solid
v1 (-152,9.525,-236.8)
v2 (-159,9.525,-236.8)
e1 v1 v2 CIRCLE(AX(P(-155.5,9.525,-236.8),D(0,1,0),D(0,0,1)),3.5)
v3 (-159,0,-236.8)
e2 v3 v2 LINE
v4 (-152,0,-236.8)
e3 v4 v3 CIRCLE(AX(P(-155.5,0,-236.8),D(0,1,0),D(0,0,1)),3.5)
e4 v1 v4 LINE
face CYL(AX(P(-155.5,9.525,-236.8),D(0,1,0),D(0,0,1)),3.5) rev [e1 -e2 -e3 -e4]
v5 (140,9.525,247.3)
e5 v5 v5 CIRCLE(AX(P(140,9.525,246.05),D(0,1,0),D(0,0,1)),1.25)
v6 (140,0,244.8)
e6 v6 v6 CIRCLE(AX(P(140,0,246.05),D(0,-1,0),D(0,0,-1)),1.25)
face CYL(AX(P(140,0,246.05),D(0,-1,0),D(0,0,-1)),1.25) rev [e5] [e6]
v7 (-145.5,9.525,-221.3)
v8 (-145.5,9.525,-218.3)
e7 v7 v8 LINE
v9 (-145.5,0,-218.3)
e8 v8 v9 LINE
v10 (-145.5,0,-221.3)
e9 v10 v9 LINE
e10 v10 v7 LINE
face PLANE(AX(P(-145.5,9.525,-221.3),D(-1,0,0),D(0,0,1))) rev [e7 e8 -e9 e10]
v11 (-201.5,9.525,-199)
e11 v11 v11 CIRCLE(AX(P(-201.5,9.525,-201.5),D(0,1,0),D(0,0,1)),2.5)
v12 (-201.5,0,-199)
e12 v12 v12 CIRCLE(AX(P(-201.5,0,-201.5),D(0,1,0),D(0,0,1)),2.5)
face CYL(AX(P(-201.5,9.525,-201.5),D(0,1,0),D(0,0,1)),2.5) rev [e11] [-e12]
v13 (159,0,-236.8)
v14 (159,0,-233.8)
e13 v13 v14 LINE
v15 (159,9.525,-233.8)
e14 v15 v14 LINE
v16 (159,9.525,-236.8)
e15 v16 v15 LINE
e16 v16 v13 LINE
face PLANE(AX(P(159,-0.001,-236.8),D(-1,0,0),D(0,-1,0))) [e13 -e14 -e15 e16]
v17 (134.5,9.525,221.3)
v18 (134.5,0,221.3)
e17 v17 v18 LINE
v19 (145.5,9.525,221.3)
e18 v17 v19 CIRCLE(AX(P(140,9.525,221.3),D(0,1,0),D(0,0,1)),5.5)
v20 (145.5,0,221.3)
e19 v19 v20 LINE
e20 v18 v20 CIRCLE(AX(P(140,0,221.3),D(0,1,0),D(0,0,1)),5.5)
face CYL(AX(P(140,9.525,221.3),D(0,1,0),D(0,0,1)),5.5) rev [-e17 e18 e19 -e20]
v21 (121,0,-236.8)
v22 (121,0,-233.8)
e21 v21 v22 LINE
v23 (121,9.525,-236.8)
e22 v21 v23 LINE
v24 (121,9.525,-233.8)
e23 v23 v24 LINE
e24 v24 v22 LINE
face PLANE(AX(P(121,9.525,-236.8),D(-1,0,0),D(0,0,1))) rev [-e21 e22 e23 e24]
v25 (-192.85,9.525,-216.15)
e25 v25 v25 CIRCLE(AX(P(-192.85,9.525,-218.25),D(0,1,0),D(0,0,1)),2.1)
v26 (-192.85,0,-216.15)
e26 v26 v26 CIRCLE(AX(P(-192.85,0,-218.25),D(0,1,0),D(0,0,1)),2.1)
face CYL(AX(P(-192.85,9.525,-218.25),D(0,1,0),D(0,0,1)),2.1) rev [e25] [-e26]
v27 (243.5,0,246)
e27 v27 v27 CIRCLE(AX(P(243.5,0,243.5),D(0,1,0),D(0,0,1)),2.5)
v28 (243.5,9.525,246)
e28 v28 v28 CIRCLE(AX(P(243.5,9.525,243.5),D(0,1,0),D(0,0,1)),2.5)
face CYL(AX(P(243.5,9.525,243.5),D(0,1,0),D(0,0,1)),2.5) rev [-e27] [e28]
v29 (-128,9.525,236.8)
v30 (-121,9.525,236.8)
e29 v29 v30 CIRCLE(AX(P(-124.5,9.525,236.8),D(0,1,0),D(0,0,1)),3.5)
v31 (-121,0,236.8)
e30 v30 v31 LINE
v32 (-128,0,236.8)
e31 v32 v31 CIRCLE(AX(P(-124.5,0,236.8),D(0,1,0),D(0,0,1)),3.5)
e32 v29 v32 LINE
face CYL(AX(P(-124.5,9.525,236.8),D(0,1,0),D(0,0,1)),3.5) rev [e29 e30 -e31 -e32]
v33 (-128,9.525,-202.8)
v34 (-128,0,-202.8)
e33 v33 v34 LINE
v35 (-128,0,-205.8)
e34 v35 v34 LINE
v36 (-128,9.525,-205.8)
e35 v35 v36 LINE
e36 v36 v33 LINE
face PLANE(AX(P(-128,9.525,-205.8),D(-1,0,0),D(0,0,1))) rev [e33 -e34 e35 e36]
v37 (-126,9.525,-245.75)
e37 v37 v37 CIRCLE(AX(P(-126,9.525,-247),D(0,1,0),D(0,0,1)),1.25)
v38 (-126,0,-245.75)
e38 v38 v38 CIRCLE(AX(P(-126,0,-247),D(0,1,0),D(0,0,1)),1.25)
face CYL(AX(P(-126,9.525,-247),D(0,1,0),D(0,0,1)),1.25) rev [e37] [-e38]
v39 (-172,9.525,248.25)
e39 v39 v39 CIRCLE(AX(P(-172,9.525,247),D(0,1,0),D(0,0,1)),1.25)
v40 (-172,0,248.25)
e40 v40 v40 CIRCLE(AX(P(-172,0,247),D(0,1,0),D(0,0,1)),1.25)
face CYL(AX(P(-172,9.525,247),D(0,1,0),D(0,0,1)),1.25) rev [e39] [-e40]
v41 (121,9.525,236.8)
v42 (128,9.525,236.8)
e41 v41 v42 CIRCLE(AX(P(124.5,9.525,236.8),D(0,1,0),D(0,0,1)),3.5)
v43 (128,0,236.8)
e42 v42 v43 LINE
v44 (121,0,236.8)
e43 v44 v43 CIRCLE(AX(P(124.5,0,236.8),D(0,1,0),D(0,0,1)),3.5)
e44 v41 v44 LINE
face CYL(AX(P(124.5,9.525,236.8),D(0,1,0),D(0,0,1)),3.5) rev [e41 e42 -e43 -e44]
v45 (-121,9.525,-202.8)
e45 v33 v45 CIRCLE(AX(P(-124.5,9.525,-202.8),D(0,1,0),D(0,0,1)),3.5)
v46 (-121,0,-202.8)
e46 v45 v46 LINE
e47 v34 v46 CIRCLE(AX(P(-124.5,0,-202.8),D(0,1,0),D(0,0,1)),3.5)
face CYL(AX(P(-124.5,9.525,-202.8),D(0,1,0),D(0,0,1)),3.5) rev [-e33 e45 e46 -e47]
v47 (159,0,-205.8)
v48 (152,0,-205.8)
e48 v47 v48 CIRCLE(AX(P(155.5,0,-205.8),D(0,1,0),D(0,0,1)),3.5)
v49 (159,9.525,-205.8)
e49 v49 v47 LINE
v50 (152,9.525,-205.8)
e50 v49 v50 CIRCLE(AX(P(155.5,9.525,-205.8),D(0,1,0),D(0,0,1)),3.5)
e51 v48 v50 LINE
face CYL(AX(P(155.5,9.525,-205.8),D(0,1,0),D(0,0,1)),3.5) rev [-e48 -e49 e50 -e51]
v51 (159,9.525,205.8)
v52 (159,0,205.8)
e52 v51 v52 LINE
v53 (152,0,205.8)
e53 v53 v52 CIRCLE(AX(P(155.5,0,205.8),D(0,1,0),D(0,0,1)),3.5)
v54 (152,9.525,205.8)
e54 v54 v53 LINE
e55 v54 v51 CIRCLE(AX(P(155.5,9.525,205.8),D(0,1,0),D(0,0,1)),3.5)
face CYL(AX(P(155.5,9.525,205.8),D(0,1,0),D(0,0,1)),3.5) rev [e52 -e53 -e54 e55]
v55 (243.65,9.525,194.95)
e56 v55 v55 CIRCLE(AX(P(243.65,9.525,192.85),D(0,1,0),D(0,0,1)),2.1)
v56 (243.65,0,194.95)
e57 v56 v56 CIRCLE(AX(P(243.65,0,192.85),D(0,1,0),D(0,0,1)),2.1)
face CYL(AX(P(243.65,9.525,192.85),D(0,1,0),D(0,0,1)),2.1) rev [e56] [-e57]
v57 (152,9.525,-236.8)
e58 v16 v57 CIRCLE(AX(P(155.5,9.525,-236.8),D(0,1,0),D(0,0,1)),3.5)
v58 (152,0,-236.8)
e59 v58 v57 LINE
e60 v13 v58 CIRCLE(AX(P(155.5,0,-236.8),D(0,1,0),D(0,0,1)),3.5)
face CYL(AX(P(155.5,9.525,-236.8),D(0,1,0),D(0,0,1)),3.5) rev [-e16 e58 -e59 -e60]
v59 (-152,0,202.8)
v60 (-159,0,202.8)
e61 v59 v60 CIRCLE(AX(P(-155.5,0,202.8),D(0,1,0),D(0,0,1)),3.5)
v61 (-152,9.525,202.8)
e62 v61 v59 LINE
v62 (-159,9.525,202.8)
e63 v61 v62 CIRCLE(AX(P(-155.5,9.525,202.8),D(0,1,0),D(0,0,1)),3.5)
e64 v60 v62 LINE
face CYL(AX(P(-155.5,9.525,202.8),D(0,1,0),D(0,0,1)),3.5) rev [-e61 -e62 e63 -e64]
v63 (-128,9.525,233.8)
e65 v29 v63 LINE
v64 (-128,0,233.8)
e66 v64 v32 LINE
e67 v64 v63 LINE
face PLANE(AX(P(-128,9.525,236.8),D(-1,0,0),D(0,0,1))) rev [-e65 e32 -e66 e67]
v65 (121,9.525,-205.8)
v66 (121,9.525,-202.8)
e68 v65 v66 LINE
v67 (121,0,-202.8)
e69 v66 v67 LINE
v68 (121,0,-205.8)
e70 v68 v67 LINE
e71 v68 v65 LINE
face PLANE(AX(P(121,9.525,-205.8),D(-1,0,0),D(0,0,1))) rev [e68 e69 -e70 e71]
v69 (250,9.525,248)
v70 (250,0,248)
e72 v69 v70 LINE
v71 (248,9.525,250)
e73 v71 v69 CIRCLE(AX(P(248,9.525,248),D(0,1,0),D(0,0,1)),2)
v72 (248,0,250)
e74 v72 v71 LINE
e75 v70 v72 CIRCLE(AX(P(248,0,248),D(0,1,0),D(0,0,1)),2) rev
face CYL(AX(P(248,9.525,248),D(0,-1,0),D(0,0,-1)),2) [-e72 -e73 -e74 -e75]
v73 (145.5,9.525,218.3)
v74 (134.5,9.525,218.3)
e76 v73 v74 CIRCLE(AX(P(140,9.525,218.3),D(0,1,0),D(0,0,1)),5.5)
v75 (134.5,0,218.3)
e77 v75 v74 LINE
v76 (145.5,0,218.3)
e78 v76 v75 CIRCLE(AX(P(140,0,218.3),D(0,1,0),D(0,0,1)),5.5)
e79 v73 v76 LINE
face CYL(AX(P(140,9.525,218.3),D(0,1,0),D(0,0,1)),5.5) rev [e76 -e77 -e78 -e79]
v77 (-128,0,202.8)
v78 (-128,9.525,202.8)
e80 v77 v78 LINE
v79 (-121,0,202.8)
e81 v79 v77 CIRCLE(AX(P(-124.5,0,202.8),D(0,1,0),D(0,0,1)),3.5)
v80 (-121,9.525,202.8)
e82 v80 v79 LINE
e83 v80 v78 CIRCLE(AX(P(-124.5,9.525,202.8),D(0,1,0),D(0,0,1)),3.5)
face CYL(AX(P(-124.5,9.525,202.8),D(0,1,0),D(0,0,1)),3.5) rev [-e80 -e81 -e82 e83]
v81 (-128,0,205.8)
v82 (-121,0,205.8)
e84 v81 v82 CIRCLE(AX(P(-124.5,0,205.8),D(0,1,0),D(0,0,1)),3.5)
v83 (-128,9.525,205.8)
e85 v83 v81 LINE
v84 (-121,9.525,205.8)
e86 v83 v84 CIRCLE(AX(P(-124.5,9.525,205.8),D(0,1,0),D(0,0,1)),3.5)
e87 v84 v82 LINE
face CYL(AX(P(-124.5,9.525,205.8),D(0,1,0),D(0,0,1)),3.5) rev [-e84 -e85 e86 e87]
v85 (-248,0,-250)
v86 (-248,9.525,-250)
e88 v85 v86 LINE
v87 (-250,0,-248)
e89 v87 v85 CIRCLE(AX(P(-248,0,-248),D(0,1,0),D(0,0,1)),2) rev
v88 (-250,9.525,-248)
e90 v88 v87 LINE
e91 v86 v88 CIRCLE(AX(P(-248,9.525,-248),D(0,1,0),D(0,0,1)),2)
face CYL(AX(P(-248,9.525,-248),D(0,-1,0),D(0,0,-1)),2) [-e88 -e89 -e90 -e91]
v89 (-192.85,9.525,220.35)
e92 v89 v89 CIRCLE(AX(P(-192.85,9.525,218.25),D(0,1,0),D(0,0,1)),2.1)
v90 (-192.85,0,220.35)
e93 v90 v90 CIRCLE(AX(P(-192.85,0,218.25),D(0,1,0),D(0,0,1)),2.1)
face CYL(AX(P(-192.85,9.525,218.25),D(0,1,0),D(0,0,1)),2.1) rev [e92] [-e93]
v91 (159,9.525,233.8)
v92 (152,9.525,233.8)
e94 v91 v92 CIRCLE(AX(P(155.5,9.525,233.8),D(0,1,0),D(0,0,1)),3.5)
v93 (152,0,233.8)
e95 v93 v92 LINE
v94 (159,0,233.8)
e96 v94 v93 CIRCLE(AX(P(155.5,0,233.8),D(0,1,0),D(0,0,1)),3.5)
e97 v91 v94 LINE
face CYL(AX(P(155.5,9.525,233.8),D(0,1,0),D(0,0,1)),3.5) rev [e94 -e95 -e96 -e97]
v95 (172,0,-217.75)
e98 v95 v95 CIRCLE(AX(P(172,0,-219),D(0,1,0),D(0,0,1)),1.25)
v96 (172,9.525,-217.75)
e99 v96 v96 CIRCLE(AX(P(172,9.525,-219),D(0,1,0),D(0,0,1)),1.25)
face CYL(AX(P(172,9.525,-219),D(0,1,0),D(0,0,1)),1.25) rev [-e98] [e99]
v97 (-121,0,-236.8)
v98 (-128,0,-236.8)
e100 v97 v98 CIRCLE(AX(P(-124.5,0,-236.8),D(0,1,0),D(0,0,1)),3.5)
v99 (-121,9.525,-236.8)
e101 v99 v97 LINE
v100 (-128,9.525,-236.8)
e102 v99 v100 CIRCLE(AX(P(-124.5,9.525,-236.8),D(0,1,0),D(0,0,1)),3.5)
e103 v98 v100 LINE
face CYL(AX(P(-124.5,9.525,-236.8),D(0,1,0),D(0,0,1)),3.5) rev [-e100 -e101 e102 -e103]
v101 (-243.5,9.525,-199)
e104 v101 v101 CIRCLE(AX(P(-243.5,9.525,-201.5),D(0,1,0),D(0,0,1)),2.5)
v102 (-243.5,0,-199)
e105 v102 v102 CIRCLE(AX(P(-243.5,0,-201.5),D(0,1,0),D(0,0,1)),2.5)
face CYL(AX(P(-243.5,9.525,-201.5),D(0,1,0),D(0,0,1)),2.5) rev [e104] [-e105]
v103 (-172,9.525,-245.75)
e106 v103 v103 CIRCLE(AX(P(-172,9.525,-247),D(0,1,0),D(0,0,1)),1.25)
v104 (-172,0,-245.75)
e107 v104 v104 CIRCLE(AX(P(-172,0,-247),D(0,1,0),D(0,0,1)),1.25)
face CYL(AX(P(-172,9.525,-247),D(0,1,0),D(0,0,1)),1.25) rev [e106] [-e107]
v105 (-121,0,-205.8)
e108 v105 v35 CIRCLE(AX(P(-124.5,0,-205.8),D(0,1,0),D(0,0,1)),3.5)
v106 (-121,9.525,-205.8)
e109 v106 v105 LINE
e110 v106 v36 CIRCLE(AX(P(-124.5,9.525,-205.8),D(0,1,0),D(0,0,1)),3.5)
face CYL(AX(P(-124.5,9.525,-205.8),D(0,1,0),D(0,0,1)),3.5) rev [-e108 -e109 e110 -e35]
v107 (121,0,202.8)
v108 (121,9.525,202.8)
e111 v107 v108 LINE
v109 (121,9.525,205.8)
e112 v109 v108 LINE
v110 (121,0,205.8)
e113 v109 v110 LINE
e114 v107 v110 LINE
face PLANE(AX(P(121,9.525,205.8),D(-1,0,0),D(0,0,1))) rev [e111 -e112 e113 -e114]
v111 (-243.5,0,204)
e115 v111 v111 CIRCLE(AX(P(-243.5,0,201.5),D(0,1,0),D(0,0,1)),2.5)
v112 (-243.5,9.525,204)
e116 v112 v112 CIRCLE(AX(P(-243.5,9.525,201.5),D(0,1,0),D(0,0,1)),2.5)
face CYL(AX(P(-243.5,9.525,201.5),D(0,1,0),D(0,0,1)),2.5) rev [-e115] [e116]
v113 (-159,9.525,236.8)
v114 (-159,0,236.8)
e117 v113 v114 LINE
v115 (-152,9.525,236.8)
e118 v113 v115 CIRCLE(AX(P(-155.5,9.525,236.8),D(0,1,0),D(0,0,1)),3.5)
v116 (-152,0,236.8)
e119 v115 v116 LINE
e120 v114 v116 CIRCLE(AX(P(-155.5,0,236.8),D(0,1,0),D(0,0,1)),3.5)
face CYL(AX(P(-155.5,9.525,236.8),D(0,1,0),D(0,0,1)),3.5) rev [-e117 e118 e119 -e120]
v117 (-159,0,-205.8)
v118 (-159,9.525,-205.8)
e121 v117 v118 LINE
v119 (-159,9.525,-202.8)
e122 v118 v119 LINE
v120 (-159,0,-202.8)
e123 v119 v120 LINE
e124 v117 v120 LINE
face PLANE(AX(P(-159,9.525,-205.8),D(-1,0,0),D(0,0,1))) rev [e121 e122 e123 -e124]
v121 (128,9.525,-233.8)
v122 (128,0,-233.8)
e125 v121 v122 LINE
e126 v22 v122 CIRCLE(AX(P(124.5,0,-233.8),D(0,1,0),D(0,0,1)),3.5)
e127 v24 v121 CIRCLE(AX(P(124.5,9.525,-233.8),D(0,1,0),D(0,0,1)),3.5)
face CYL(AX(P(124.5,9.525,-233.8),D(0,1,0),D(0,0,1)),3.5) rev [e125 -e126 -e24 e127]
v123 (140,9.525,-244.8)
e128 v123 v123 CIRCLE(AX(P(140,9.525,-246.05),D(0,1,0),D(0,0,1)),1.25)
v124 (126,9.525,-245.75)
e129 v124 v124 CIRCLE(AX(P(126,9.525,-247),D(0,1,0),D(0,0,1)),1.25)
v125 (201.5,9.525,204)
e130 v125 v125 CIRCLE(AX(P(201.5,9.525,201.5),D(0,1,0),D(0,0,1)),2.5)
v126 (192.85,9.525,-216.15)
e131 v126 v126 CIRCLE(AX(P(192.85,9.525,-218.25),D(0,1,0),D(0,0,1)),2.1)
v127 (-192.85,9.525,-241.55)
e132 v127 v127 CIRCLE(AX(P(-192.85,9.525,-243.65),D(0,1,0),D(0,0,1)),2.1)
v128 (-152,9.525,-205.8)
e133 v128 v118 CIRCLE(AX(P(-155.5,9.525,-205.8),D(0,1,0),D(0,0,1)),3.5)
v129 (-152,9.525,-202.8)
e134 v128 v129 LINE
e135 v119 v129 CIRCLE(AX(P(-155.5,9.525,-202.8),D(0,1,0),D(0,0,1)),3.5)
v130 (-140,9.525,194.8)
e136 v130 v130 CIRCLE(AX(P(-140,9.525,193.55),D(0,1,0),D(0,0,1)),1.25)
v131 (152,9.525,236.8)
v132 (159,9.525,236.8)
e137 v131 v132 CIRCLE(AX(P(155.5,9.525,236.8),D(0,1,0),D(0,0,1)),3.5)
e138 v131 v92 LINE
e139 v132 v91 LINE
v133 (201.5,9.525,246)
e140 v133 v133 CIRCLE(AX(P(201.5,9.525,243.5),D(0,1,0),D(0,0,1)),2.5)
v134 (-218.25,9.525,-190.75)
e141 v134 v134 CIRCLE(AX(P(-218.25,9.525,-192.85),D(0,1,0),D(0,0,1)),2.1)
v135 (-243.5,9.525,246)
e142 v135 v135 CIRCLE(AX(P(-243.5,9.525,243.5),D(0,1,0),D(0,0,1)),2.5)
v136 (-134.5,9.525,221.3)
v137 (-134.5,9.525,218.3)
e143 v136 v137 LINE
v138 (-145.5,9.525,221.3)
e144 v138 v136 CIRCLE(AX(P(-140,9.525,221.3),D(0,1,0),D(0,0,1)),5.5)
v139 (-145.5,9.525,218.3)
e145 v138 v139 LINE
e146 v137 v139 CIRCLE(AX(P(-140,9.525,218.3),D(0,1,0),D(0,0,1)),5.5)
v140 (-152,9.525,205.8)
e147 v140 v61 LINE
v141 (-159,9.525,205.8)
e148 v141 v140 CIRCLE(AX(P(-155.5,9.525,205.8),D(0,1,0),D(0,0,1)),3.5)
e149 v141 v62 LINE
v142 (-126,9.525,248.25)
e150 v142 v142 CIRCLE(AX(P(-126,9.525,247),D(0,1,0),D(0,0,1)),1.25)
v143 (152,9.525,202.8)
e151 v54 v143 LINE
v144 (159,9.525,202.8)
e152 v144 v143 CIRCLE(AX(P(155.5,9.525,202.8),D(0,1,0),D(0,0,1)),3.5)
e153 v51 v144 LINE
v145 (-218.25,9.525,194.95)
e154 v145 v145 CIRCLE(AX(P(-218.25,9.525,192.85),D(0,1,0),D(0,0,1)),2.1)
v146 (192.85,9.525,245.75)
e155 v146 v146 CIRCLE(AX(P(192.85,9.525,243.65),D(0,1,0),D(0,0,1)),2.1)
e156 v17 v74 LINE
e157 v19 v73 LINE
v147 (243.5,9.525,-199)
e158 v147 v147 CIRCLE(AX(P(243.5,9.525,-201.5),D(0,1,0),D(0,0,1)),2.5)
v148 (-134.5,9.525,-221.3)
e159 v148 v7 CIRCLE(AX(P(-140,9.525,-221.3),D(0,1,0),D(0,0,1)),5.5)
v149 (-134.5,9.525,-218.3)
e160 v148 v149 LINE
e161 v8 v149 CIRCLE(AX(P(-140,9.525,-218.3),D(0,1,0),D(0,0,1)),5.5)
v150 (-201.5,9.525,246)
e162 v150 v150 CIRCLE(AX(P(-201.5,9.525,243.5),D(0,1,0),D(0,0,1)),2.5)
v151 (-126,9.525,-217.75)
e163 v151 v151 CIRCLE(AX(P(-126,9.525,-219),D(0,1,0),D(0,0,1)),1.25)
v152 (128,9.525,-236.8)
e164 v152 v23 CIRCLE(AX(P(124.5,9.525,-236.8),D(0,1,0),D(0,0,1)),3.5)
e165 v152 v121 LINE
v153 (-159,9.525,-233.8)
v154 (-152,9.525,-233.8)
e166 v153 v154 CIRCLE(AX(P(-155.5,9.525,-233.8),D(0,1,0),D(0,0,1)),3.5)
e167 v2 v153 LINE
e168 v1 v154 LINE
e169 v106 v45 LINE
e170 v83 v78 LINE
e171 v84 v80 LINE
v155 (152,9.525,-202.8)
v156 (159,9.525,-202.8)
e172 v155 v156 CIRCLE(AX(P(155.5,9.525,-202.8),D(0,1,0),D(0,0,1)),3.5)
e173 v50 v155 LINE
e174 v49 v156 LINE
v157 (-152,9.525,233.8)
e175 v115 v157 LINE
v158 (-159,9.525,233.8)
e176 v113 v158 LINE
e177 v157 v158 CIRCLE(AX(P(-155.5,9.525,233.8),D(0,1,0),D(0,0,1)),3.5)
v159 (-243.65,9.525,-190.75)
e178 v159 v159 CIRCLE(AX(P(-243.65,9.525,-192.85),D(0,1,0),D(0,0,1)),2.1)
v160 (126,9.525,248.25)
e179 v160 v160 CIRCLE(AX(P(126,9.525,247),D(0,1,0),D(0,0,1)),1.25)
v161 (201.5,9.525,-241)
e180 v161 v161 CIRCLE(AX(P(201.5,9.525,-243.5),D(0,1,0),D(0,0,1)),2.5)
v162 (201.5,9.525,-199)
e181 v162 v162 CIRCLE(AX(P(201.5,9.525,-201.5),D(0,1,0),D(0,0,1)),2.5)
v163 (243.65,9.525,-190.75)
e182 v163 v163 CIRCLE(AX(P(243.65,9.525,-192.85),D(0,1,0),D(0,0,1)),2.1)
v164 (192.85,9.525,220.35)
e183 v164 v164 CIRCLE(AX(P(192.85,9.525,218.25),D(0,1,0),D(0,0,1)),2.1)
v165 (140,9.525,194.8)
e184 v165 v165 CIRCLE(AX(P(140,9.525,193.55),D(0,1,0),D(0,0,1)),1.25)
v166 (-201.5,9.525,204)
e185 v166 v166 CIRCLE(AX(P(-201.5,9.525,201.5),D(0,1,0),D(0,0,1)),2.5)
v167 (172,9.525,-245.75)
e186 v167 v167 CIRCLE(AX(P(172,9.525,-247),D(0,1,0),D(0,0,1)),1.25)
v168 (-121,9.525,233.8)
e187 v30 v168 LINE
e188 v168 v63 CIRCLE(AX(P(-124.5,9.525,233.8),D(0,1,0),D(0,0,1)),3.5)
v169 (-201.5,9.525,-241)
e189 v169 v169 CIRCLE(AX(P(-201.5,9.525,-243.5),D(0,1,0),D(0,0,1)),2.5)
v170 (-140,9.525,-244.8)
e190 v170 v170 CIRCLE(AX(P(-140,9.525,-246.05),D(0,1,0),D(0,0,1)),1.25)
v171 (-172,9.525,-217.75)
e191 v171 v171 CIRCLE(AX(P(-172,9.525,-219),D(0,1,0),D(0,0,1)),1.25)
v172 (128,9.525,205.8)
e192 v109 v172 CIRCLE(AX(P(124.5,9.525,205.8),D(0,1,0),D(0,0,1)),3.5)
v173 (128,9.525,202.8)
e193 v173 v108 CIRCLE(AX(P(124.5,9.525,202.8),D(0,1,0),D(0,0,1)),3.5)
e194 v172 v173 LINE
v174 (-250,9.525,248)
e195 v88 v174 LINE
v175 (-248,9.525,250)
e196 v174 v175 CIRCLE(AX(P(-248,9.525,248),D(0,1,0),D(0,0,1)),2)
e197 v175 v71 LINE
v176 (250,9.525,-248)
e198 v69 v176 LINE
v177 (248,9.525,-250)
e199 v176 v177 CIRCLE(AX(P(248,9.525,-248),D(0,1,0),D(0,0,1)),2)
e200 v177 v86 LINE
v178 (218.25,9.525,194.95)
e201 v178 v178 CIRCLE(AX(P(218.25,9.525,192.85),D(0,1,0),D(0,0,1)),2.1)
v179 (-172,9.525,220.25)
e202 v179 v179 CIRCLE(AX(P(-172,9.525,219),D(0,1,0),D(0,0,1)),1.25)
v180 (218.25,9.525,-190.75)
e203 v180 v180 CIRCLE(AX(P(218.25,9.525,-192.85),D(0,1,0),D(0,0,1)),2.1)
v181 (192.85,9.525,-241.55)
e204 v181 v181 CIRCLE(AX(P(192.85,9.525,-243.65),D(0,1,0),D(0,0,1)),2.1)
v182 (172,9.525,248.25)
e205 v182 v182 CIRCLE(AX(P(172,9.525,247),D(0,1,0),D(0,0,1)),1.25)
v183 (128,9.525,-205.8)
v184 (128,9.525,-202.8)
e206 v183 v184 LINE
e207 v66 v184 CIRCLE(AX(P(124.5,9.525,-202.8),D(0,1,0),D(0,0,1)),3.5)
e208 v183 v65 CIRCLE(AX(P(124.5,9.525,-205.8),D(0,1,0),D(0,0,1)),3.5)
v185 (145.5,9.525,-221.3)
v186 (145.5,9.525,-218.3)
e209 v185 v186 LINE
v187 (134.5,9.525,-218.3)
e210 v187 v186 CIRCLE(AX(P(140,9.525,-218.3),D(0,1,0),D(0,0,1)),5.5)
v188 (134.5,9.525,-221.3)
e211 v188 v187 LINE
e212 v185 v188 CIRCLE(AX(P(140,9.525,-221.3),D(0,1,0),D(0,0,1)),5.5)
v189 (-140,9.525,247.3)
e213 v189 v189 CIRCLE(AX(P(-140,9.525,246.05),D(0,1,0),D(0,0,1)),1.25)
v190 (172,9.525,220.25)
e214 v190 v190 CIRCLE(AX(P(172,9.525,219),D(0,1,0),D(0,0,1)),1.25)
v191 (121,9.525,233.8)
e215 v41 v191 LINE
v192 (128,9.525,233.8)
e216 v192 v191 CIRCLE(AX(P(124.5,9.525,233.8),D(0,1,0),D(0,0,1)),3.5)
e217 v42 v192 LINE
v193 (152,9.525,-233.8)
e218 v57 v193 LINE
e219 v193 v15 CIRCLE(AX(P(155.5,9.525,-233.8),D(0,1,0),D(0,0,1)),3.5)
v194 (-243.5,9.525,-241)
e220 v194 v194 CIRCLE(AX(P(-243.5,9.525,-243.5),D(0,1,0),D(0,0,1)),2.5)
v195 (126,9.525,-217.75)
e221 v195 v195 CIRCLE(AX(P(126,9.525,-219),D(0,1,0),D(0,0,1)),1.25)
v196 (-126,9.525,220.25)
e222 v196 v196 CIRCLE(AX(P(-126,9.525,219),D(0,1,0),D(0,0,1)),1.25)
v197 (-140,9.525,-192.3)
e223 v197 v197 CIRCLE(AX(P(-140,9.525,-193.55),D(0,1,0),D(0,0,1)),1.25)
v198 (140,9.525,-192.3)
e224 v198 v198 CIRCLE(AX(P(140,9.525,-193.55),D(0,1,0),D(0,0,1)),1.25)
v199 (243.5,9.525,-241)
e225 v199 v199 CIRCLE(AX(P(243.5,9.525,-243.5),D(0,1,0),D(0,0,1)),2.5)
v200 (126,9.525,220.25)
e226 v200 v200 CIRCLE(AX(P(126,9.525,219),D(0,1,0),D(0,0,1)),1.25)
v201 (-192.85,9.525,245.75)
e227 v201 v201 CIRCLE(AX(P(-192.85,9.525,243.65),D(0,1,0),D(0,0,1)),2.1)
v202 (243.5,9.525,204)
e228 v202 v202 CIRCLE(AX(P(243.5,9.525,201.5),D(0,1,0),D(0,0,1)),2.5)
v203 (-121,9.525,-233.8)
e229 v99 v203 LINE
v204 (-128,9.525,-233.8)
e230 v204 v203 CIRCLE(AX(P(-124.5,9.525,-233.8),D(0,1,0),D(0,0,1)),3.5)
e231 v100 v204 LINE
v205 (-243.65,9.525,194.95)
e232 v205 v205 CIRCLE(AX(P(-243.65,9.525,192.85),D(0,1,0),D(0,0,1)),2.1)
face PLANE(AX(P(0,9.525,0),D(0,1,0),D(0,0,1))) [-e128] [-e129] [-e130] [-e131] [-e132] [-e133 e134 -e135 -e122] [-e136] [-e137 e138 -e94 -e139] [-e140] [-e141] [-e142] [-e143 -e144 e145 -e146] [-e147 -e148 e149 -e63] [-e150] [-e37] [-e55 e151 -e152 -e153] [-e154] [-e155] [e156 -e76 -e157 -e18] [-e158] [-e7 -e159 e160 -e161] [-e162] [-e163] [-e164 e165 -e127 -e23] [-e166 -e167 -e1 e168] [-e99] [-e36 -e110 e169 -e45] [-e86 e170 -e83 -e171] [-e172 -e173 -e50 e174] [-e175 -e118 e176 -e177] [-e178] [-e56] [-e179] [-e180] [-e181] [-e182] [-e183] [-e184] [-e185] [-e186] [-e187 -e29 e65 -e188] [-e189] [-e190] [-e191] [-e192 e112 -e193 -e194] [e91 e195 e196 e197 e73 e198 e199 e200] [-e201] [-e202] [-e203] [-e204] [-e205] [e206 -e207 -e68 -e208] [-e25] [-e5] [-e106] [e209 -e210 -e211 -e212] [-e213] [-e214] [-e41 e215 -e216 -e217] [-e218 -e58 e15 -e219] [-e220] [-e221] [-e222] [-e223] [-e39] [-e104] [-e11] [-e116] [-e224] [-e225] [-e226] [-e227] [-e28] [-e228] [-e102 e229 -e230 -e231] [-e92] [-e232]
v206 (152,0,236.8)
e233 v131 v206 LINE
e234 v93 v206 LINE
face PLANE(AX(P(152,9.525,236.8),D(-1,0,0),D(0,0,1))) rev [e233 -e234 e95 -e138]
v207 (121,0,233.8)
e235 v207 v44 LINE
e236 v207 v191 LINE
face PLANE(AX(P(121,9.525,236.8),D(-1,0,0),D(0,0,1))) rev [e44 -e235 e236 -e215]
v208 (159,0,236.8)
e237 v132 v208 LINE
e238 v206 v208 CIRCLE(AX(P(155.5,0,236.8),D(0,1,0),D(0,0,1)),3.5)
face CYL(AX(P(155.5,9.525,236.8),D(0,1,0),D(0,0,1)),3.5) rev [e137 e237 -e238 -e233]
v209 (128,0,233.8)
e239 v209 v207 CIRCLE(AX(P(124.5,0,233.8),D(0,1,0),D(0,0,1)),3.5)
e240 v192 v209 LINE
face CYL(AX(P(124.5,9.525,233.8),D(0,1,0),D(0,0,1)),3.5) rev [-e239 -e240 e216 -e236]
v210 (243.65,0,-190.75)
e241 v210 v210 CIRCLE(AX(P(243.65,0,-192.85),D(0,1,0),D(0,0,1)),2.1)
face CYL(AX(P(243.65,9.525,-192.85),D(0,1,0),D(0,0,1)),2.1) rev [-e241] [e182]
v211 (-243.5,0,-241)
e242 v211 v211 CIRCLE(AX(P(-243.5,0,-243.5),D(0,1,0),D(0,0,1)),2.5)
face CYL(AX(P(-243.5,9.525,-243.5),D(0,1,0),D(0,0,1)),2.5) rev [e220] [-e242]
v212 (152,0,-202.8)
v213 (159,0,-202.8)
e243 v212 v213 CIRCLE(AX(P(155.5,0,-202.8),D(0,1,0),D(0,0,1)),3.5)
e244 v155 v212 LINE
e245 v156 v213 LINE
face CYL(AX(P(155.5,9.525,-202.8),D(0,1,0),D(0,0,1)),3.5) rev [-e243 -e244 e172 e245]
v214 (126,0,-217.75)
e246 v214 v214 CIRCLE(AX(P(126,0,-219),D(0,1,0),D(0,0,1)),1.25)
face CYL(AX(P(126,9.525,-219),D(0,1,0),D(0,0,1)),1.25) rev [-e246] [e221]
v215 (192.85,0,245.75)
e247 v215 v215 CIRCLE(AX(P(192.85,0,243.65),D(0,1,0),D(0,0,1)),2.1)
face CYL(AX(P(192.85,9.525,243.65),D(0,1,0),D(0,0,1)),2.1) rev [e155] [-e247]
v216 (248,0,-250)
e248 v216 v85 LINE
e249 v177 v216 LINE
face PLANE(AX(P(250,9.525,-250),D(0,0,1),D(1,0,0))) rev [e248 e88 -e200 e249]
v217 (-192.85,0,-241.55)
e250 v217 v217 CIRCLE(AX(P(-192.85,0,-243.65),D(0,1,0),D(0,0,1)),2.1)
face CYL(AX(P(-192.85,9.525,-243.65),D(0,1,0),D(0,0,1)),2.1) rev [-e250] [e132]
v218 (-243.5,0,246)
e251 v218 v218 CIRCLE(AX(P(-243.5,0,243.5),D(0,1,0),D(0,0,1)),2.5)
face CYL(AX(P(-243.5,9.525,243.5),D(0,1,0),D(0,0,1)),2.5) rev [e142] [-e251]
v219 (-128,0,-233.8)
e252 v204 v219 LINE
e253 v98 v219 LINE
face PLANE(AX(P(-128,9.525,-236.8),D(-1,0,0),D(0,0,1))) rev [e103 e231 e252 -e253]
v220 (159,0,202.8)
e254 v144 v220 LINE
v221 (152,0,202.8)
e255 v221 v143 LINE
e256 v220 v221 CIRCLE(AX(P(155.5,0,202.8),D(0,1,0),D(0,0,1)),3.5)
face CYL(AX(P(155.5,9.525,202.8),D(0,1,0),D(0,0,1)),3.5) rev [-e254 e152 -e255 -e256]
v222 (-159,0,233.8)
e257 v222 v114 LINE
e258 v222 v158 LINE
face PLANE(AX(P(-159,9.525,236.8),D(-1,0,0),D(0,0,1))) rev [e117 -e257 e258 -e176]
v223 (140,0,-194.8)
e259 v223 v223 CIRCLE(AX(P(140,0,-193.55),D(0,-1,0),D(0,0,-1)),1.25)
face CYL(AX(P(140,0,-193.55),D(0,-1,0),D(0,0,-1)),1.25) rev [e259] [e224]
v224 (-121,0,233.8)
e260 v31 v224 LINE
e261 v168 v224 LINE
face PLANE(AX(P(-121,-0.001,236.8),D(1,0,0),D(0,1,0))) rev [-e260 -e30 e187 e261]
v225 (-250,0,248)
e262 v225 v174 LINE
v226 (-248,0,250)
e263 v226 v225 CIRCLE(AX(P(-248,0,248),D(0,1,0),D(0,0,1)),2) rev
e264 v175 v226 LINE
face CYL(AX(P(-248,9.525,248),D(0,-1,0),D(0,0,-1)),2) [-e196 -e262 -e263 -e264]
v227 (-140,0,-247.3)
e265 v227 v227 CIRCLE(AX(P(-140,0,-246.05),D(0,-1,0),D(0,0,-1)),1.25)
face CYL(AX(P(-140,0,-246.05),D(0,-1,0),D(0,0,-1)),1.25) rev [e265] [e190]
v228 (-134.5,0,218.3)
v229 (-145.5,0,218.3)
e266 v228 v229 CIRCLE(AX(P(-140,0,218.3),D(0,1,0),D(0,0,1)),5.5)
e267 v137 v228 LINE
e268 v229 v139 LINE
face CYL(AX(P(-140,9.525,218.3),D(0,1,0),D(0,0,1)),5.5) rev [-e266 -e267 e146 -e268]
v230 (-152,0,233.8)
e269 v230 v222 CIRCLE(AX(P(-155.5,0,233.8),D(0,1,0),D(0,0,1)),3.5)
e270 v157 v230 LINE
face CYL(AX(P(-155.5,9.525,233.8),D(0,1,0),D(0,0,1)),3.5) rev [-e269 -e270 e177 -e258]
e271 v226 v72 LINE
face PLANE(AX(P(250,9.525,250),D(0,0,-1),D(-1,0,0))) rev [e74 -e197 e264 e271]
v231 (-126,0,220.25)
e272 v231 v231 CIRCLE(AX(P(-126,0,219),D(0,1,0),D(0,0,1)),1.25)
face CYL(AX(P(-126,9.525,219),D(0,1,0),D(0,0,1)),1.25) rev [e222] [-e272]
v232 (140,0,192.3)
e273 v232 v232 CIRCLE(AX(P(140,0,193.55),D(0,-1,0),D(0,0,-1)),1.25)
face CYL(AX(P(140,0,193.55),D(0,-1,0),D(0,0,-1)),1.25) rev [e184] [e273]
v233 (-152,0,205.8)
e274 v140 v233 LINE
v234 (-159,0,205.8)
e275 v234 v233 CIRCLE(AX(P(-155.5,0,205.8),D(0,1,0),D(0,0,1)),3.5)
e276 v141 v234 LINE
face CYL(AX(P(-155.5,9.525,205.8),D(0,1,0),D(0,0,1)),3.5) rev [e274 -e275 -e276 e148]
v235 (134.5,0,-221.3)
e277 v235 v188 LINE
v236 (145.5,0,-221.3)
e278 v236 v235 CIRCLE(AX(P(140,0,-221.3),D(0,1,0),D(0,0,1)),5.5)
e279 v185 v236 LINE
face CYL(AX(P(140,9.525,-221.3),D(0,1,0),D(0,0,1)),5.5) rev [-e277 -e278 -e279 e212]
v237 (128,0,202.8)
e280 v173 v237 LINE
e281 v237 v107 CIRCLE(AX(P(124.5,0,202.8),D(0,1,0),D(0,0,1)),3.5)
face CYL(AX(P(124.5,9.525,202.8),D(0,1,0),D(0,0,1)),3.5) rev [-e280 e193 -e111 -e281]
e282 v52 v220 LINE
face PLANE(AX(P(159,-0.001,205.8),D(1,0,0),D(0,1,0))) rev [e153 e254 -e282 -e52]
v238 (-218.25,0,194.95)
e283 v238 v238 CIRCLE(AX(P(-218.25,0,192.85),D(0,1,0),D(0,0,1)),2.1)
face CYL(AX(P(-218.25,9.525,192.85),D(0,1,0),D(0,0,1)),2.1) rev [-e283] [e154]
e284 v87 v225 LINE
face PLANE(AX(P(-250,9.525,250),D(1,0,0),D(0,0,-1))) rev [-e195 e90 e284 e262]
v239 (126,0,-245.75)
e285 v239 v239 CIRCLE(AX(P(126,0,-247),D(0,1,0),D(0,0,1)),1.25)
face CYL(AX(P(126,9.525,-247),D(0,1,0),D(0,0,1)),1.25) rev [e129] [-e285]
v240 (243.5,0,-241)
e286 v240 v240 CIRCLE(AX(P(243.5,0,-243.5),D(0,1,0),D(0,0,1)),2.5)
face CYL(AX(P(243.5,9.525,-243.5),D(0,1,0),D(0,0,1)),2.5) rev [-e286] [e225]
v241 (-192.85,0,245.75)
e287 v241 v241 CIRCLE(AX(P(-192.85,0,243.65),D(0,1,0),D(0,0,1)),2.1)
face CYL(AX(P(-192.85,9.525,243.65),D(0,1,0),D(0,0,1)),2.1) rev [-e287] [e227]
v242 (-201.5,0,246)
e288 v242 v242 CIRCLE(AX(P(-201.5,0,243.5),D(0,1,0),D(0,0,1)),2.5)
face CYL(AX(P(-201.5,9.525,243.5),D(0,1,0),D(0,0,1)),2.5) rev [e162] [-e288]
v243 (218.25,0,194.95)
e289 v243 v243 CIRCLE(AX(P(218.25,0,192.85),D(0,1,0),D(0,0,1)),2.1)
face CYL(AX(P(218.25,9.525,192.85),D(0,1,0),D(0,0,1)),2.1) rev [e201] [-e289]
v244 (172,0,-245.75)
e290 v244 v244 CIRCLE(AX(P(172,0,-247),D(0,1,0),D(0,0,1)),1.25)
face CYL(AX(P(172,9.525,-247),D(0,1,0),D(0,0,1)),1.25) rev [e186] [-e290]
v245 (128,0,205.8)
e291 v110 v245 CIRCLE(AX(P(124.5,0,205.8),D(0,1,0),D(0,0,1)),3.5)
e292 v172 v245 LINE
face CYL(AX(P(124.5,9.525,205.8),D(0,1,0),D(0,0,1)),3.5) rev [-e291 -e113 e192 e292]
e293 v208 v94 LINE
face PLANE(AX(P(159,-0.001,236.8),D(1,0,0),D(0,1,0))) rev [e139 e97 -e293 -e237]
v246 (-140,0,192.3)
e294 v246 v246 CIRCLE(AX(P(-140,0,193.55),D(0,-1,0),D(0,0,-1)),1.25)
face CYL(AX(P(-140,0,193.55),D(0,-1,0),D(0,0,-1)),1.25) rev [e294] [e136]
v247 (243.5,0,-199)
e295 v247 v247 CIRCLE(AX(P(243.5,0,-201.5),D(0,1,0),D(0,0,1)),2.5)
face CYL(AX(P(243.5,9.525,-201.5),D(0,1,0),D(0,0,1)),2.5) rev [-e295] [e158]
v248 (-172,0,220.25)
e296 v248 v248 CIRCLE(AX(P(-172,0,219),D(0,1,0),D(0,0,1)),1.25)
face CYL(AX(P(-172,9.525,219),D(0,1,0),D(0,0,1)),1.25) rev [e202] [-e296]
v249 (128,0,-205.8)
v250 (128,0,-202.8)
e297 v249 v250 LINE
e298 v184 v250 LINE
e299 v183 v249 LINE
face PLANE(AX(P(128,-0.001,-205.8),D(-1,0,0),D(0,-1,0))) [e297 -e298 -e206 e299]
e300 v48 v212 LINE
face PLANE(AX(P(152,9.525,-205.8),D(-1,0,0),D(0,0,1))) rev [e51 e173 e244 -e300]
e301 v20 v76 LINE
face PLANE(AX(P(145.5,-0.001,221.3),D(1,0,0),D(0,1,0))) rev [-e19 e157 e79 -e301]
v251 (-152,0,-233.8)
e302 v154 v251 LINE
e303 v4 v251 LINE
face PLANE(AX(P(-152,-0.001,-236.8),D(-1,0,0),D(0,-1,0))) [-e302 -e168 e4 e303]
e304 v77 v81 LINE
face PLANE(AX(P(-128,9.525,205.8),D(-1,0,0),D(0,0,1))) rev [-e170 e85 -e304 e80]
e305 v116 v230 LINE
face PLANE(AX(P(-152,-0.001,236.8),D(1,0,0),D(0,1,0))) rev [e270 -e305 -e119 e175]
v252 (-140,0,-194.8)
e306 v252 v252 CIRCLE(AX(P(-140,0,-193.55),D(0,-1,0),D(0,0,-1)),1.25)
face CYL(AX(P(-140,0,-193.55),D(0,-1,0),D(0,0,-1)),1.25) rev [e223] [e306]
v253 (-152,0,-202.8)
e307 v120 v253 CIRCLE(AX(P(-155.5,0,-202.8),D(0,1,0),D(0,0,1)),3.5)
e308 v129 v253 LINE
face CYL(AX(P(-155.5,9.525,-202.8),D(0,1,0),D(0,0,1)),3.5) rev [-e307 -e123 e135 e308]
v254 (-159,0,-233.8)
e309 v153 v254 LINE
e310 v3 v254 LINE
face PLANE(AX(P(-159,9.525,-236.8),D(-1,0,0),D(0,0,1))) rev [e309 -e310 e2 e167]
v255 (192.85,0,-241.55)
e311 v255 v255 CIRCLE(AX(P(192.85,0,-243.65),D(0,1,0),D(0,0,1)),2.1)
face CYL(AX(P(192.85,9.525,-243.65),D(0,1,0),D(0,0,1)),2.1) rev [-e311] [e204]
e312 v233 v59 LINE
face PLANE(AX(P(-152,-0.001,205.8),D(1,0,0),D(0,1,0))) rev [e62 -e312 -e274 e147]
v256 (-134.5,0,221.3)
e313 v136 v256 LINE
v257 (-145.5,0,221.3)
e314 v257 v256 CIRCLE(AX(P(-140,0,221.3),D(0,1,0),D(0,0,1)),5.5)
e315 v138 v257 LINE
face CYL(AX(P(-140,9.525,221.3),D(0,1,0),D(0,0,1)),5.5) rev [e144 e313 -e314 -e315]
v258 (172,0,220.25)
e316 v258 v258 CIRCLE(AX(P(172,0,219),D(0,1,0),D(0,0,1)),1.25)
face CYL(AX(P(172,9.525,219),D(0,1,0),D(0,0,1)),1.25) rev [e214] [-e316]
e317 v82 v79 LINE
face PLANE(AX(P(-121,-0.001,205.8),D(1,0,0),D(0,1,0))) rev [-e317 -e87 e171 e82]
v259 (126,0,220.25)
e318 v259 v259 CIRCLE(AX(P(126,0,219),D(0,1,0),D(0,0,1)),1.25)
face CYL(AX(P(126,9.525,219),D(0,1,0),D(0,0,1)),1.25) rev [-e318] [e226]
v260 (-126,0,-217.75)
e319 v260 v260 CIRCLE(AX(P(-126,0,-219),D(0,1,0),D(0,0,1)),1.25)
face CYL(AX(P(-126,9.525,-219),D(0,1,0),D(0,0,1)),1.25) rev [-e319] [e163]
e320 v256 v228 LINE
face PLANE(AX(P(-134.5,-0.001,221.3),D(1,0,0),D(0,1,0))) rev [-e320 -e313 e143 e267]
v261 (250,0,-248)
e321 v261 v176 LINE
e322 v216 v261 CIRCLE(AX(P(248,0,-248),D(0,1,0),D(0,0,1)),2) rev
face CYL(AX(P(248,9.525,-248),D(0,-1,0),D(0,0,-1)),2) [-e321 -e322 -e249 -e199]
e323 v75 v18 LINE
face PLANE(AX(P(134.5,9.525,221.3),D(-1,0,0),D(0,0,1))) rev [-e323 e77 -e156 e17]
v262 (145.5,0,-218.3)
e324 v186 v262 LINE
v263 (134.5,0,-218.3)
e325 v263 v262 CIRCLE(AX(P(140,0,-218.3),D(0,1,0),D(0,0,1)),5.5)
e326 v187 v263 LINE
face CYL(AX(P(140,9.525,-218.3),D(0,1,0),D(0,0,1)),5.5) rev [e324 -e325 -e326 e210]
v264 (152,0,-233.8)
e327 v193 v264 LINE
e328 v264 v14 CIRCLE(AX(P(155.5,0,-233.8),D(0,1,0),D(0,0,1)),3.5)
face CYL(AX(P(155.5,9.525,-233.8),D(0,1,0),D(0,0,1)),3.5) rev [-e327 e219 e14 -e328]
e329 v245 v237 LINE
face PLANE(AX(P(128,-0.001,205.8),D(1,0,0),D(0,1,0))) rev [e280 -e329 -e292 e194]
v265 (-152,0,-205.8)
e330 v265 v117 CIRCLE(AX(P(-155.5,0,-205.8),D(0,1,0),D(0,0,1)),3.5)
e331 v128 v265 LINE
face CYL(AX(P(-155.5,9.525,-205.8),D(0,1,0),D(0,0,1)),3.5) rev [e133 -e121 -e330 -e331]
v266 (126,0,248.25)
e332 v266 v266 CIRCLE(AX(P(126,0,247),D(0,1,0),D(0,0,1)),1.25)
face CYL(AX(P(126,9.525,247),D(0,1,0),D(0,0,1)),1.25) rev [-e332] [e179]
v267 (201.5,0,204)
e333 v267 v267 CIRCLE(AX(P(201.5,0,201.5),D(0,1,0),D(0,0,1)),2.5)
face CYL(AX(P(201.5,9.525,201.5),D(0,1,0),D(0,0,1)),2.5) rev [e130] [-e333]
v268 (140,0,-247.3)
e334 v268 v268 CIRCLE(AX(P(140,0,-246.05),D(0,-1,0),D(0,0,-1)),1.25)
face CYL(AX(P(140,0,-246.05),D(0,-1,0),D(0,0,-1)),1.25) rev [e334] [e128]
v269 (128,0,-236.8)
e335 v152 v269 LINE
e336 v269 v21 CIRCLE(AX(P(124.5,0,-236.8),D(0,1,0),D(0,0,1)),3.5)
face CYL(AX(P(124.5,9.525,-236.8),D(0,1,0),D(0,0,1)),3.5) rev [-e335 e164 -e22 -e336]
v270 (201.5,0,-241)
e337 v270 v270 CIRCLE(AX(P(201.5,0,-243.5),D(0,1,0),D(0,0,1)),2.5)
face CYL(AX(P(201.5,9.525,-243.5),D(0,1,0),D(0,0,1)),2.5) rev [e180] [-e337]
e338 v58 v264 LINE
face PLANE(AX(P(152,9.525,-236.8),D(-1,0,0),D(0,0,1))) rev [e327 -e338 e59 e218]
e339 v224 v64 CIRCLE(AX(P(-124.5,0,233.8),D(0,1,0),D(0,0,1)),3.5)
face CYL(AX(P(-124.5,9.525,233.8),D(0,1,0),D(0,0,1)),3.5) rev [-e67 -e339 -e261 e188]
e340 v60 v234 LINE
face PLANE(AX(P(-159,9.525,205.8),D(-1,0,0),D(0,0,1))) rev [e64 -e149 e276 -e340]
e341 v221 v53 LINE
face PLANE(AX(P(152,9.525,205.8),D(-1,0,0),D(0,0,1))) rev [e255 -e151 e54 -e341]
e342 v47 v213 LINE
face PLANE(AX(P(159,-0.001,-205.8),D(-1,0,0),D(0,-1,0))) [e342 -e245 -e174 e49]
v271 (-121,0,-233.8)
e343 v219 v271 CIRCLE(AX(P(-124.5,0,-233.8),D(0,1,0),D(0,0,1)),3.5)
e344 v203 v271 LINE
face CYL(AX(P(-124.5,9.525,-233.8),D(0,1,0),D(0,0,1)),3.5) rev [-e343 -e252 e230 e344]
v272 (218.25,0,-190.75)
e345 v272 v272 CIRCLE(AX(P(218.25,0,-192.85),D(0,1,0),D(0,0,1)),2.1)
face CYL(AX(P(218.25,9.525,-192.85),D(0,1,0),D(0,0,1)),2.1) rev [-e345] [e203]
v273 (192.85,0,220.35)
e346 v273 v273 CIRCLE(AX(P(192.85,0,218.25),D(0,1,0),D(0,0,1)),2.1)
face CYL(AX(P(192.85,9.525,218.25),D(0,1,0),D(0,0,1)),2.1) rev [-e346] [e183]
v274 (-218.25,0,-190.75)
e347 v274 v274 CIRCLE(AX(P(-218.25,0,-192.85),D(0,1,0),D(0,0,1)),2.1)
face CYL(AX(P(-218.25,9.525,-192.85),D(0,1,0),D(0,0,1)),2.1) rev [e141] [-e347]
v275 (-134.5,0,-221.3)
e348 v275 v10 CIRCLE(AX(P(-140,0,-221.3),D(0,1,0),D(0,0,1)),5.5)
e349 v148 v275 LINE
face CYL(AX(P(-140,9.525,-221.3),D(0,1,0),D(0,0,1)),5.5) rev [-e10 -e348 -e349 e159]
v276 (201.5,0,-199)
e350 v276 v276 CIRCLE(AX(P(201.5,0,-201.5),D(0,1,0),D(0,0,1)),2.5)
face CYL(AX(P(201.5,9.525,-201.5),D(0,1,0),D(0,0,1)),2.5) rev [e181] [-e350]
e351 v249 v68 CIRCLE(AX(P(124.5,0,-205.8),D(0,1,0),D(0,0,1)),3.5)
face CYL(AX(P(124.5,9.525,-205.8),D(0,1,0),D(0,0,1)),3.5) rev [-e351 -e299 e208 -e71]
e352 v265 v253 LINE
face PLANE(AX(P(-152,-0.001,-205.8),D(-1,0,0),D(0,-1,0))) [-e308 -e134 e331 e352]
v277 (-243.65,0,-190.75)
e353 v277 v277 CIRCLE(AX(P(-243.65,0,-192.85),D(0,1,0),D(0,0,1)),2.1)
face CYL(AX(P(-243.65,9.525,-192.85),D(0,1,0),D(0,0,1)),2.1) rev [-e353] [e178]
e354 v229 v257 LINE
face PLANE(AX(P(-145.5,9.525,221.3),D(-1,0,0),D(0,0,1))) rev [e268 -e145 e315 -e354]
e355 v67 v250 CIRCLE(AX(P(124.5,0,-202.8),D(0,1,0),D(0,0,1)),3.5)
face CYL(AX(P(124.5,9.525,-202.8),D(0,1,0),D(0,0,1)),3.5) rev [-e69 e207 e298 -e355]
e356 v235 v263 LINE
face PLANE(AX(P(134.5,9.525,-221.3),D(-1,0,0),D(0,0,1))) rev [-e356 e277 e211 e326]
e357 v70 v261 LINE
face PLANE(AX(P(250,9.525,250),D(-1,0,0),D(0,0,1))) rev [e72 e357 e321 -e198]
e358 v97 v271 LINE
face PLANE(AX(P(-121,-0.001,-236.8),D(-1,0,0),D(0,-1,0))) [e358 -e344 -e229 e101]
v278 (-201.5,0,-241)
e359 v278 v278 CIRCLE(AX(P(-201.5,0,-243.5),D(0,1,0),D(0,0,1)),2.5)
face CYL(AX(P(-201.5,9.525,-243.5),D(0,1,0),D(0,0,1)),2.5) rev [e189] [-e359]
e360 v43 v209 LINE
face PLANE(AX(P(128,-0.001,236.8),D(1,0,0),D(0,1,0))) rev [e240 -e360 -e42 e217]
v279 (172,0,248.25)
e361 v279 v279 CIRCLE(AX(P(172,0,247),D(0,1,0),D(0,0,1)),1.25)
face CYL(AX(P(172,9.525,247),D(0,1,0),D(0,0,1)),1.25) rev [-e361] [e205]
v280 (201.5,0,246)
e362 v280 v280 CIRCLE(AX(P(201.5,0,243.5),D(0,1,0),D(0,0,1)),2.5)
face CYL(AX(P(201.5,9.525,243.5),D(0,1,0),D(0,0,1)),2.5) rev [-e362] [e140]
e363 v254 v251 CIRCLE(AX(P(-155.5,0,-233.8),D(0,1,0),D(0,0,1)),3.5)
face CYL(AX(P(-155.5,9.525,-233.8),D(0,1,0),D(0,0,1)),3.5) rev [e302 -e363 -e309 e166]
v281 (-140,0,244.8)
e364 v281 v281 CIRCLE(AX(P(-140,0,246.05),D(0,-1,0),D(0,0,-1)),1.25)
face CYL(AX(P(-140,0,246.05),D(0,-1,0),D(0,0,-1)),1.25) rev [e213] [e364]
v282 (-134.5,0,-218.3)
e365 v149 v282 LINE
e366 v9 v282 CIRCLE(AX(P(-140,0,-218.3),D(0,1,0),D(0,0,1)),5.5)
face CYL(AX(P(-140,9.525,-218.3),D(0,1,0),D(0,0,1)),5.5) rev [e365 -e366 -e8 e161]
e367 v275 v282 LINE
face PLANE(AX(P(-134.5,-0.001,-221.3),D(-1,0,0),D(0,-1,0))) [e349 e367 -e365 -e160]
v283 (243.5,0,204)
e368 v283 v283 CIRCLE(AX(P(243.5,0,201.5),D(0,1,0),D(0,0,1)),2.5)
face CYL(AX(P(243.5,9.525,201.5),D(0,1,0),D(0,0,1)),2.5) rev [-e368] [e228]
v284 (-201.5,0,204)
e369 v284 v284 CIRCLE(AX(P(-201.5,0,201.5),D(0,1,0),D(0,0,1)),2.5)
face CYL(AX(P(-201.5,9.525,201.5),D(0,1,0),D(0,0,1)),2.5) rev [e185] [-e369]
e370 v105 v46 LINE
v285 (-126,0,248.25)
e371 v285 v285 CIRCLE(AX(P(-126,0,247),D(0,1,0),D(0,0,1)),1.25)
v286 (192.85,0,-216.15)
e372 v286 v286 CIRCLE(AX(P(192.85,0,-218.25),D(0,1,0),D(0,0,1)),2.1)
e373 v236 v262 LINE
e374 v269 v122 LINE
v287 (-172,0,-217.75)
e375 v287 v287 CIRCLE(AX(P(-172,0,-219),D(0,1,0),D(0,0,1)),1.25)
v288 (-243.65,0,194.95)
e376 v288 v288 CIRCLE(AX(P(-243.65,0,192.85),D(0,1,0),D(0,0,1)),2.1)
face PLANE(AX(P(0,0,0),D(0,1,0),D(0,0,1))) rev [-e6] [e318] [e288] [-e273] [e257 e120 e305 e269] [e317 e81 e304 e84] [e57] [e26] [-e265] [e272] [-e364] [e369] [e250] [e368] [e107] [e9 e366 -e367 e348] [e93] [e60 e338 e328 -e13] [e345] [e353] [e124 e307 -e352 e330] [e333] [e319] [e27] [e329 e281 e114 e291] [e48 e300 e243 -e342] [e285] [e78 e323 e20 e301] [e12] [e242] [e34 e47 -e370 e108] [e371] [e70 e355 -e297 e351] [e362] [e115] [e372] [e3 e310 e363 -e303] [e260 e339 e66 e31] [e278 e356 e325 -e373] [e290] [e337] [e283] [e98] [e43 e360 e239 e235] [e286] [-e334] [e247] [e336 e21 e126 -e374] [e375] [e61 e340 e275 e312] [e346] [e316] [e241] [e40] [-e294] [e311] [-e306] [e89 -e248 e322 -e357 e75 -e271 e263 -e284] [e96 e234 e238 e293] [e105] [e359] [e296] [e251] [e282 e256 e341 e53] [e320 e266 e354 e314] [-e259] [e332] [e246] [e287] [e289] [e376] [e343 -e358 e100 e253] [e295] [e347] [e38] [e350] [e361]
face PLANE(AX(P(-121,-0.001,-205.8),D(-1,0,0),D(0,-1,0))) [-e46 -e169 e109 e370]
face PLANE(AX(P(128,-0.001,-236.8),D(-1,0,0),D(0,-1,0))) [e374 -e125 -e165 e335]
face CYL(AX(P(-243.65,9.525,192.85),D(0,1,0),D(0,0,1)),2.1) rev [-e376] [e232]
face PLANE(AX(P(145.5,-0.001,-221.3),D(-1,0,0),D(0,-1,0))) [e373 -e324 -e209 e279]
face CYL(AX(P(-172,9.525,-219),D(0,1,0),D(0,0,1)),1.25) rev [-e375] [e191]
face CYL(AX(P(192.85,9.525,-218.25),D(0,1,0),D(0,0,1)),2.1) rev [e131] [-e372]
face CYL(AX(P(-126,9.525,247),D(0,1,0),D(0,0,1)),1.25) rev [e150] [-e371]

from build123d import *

# Parameters (mm, degrees)
SKETCH1_W                       = 500
SKETCH1_H                       = 500
BOSS_EXTRUDE1_DEPTH             = 9.525
TAP_DRILL_FOR_M3X0_5_TAP1_D     = 2.5
TAP_DRILL_FOR_M6X1_0_TAP1_D     = 5
TAP_DRILL_FOR_M5X0_8_TAP1_D     = 4.2
CIRPATTERN1_COUNT               = 4
F_11_0_11_DIAMETER_SLOT1_DEPTH  = 9.525
F_7_0_7_DIAMETER_SLOT1_DEPTH    = 9.525
TAP_DRILL_FOR_M3X0_5_TAP3_D     = 2.5
TAP_DRILL_FOR_M3X0_5_TAP3_DEPTH = 9.525
MIRROR2_COPY_1_DEPTH            = 9.525
MIRROR2_COPY_2_DEPTH            = 9.525
MIRROR2_COPY_3_D                = 2.5
MIRROR2_COPY_3_DEPTH            = 9.525
FILLET1_R                       = 2


# Read off the part's stored shape, not the designer's step: Ø11.0 (11) Diameter Slot1, Ø7.0 (7) Diameter Slot1
with BuildPart() as part:
    # Sketch1 → Boss-Extrude1 (new body)
    with BuildSketch(Plane(origin=(0, 0, 0), x_dir=(1, 0, 0), z_dir=(0, 1, 0))):
        Rectangle(SKETCH1_W, SKETCH1_H)
    extrude(amount=BOSS_EXTRUDE1_DEPTH)

    # Tap Drill for M3x0.5 Tap1 (through all)
    with Locations(Plane(origin=(0, 9.525, 0), x_dir=(1, 0, 0), z_dir=(0, 1, 0))):
        with Locations((172, -219), (126, -219), (126, -247), (172, -247), (-126, -219), (-172, -219), (-172, -247), (-126, -247), (-126, 247), (-172, 247), (-172, 219), (-126, 219), (126, 247), (172, 247), (172, 219), (126, 219)):
            Hole(TAP_DRILL_FOR_M3X0_5_TAP1_D / 2)

    # Tap Drill for M6x1.0 Tap1 (through all)
    with Locations(Plane(origin=(0, 9.525, 0), x_dir=(1, 0, 0), z_dir=(0, 1, 0))):
        with Locations((243.5, -243.5), (201.5, -201.5), (243.5, -201.5), (201.5, -243.5)):
            tap_drill_for_m6x1_0_tap1 = Hole(TAP_DRILL_FOR_M6X1_0_TAP1_D / 2)

    # Tap Drill for M5x0.8 Tap1 (through all)
    with Locations(Plane(origin=(0, 9.525, 0), x_dir=(1, 0, 0), z_dir=(0, 1, 0))):
        with Locations((192.85, -243.65), (192.85, -218.25), (218.25, -192.85), (243.65, -192.85)):
            tap_drill_for_m5x0_8_tap1 = Hole(TAP_DRILL_FOR_M5X0_8_TAP1_D / 2)

    # CirPattern1: Tap Drill for M6x1.0 Tap1, Tap Drill for M5x0.8 Tap1 ×4 about axis
    cirpattern1_axis = Axis((0, 0, 0), (0, 1, 0))
    add([tap_drill_for_m6x1_0_tap1.rotate(cirpattern1_axis, i * 360 / CIRPATTERN1_COUNT) for i in range(1, CIRPATTERN1_COUNT)], mode=Mode.SUBTRACT)
    add([tap_drill_for_m5x0_8_tap1.rotate(cirpattern1_axis, i * 360 / CIRPATTERN1_COUNT) for i in range(1, CIRPATTERN1_COUNT)], mode=Mode.SUBTRACT)

    # Ø11.0 (11) Diameter Slot1 outline → Ø11.0 (11) Diameter Slot1 (cut)
    with BuildSketch(Plane(origin=(0, 0, 0), x_dir=(1, 0, 0), z_dir=(0, 1, 0))):
        with BuildLine():
            Line((-134.5, -221.3), (-134.5, -218.3))
            ThreePointArc((-134.5, -218.3), (-140, -212.8), (-145.5, -218.3))
            Line((-145.5, -218.3), (-145.5, -221.3))
            ThreePointArc((-145.5, -221.3), (-140, -226.8), (-134.5, -221.3))
        make_face()
    f_11_0_11_diameter_slot1 = extrude(amount=F_11_0_11_DIAMETER_SLOT1_DEPTH, mode=Mode.SUBTRACT)

    # Ø7.0 (7) Diameter Slot1 outline → Ø7.0 (7) Diameter Slot1 (cut)
    with BuildSketch(Plane(origin=(0, 0, 0), x_dir=(1, 0, 0), z_dir=(0, 1, 0))):
        with BuildLine():
            Line((-152, -236.8), (-152, -233.8))
            ThreePointArc((-152, -233.8), (-155.5, -230.3), (-159, -233.8))
            Line((-159, -233.8), (-159, -236.8))
            ThreePointArc((-159, -236.8), (-155.5, -240.3), (-152, -236.8))
        make_face()
        with BuildLine():
            ThreePointArc((-152, -202.8), (-155.5, -199.3), (-159, -202.8))
            Line((-159, -202.8), (-159, -205.8))
            ThreePointArc((-159, -205.8), (-155.5, -209.3), (-152, -205.8))
            Line((-152, -205.8), (-152, -202.8))
        make_face()
        with BuildLine():
            Line((-121, -205.8), (-121, -202.8))
            ThreePointArc((-121, -202.8), (-124.5, -199.3), (-128, -202.8))
            Line((-128, -202.8), (-128, -205.8))
            ThreePointArc((-128, -205.8), (-124.5, -209.3), (-121, -205.8))
        make_face()
        with BuildLine():
            ThreePointArc((-121, -233.8), (-124.5, -230.3), (-128, -233.8))
            Line((-128, -233.8), (-128, -236.8))
            ThreePointArc((-128, -236.8), (-124.5, -240.3), (-121, -236.8))
            Line((-121, -236.8), (-121, -233.8))
        make_face()
    f_7_0_7_diameter_slot1 = extrude(amount=F_7_0_7_DIAMETER_SLOT1_DEPTH, mode=Mode.SUBTRACT)

    # Tap Drill for M3x0.5 Tap3
    with Locations(Plane(origin=(0, 0, 0), x_dir=(-1, 0, 0), z_dir=(0, -1, 0))):
        with Locations((140, -193.55), (140, -246.05), (140, -219.8)):
            tap_drill_for_m3x0_5_tap3 = Hole(TAP_DRILL_FOR_M3X0_5_TAP3_D / 2, depth=TAP_DRILL_FOR_M3X0_5_TAP3_DEPTH)

    # Mirror1: Ø11.0 (11) Diameter Slot1, Ø7.0 (7) Diameter Slot1, Tap Drill for M3x0.5 Tap3 across plane
    add(f_11_0_11_diameter_slot1.mirror(Plane(origin=(0, 0, 0), x_dir=(0, 0, 1), z_dir=(1, 0, 0))), mode=Mode.SUBTRACT)
    add(f_7_0_7_diameter_slot1.mirror(Plane(origin=(0, 0, 0), x_dir=(0, 0, 1), z_dir=(1, 0, 0))), mode=Mode.SUBTRACT)
    add(tap_drill_for_m3x0_5_tap3.mirror(Plane(origin=(0, 0, 0), x_dir=(0, 0, 1), z_dir=(1, 0, 0))), mode=Mode.SUBTRACT)

    # Mirror2: Ø11.0 (11) Diameter Slot1, Ø7.0 (7) Diameter Slot1, Tap Drill for M3x0.5 Tap3 across plane
    add(f_11_0_11_diameter_slot1.mirror(Plane.XY), mode=Mode.SUBTRACT)
    add(f_7_0_7_diameter_slot1.mirror(Plane.XY), mode=Mode.SUBTRACT)
    add(tap_drill_for_m3x0_5_tap3.mirror(Plane.XY), mode=Mode.SUBTRACT)

    # Mirror2 copy 1 sketch → Mirror2 copy 1 (cut)
    with BuildSketch(Plane(origin=(0, 0, 0), x_dir=(-1, 0, 0), z_dir=(0, 1, 0))):
        with BuildLine():
            Line((-134.5, -221.3), (-134.5, -218.3))
            ThreePointArc((-134.5, -218.3), (-140, -212.8), (-145.5, -218.3))
            Line((-145.5, -218.3), (-145.5, -221.3))
            ThreePointArc((-145.5, -221.3), (-140, -226.8), (-134.5, -221.3))
        make_face()
    extrude(amount=MIRROR2_COPY_1_DEPTH, mode=Mode.SUBTRACT)

    # Mirror2 copy 2 sketch → Mirror2 copy 2 (cut)
    with BuildSketch(Plane(origin=(0, 0, 0), x_dir=(-1, 0, 0), z_dir=(0, 1, 0))):
        with BuildLine():
            Line((-152, -236.8), (-152, -233.8))
            ThreePointArc((-152, -233.8), (-155.5, -230.3), (-159, -233.8))
            Line((-159, -233.8), (-159, -236.8))
            ThreePointArc((-159, -236.8), (-155.5, -240.3), (-152, -236.8))
        make_face()
        with BuildLine():
            ThreePointArc((-152, -202.8), (-155.5, -199.3), (-159, -202.8))
            Line((-159, -202.8), (-159, -205.8))
            ThreePointArc((-159, -205.8), (-155.5, -209.3), (-152, -205.8))
            Line((-152, -205.8), (-152, -202.8))
        make_face()
        with BuildLine():
            Line((-121, -205.8), (-121, -202.8))
            ThreePointArc((-121, -202.8), (-124.5, -199.3), (-128, -202.8))
            Line((-128, -202.8), (-128, -205.8))
            ThreePointArc((-128, -205.8), (-124.5, -209.3), (-121, -205.8))
        make_face()
        with BuildLine():
            ThreePointArc((-121, -233.8), (-124.5, -230.3), (-128, -233.8))
            Line((-128, -233.8), (-128, -236.8))
            ThreePointArc((-128, -236.8), (-124.5, -240.3), (-121, -236.8))
            Line((-121, -236.8), (-121, -233.8))
        make_face()
    extrude(amount=MIRROR2_COPY_2_DEPTH, mode=Mode.SUBTRACT)

    # Mirror2 copy 3
    with Locations(Plane.XZ):
        with Locations((140, -193.55), (140, -246.05), (140, -219.8)):
            Hole(MIRROR2_COPY_3_D / 2, depth=MIRROR2_COPY_3_DEPTH)

    # Fillet1
    fillet1_edges = [part.edges().sort_by_distance(p)[0] for p in [
        (-250, 4.7625, -250),
        (250, 4.7625, -250),
        (250, 4.7625, 250),
        (-250, 4.7625, 250),
    ]]
    fillet(fillet1_edges, radius=FILLET1_R)


solid = part.part
